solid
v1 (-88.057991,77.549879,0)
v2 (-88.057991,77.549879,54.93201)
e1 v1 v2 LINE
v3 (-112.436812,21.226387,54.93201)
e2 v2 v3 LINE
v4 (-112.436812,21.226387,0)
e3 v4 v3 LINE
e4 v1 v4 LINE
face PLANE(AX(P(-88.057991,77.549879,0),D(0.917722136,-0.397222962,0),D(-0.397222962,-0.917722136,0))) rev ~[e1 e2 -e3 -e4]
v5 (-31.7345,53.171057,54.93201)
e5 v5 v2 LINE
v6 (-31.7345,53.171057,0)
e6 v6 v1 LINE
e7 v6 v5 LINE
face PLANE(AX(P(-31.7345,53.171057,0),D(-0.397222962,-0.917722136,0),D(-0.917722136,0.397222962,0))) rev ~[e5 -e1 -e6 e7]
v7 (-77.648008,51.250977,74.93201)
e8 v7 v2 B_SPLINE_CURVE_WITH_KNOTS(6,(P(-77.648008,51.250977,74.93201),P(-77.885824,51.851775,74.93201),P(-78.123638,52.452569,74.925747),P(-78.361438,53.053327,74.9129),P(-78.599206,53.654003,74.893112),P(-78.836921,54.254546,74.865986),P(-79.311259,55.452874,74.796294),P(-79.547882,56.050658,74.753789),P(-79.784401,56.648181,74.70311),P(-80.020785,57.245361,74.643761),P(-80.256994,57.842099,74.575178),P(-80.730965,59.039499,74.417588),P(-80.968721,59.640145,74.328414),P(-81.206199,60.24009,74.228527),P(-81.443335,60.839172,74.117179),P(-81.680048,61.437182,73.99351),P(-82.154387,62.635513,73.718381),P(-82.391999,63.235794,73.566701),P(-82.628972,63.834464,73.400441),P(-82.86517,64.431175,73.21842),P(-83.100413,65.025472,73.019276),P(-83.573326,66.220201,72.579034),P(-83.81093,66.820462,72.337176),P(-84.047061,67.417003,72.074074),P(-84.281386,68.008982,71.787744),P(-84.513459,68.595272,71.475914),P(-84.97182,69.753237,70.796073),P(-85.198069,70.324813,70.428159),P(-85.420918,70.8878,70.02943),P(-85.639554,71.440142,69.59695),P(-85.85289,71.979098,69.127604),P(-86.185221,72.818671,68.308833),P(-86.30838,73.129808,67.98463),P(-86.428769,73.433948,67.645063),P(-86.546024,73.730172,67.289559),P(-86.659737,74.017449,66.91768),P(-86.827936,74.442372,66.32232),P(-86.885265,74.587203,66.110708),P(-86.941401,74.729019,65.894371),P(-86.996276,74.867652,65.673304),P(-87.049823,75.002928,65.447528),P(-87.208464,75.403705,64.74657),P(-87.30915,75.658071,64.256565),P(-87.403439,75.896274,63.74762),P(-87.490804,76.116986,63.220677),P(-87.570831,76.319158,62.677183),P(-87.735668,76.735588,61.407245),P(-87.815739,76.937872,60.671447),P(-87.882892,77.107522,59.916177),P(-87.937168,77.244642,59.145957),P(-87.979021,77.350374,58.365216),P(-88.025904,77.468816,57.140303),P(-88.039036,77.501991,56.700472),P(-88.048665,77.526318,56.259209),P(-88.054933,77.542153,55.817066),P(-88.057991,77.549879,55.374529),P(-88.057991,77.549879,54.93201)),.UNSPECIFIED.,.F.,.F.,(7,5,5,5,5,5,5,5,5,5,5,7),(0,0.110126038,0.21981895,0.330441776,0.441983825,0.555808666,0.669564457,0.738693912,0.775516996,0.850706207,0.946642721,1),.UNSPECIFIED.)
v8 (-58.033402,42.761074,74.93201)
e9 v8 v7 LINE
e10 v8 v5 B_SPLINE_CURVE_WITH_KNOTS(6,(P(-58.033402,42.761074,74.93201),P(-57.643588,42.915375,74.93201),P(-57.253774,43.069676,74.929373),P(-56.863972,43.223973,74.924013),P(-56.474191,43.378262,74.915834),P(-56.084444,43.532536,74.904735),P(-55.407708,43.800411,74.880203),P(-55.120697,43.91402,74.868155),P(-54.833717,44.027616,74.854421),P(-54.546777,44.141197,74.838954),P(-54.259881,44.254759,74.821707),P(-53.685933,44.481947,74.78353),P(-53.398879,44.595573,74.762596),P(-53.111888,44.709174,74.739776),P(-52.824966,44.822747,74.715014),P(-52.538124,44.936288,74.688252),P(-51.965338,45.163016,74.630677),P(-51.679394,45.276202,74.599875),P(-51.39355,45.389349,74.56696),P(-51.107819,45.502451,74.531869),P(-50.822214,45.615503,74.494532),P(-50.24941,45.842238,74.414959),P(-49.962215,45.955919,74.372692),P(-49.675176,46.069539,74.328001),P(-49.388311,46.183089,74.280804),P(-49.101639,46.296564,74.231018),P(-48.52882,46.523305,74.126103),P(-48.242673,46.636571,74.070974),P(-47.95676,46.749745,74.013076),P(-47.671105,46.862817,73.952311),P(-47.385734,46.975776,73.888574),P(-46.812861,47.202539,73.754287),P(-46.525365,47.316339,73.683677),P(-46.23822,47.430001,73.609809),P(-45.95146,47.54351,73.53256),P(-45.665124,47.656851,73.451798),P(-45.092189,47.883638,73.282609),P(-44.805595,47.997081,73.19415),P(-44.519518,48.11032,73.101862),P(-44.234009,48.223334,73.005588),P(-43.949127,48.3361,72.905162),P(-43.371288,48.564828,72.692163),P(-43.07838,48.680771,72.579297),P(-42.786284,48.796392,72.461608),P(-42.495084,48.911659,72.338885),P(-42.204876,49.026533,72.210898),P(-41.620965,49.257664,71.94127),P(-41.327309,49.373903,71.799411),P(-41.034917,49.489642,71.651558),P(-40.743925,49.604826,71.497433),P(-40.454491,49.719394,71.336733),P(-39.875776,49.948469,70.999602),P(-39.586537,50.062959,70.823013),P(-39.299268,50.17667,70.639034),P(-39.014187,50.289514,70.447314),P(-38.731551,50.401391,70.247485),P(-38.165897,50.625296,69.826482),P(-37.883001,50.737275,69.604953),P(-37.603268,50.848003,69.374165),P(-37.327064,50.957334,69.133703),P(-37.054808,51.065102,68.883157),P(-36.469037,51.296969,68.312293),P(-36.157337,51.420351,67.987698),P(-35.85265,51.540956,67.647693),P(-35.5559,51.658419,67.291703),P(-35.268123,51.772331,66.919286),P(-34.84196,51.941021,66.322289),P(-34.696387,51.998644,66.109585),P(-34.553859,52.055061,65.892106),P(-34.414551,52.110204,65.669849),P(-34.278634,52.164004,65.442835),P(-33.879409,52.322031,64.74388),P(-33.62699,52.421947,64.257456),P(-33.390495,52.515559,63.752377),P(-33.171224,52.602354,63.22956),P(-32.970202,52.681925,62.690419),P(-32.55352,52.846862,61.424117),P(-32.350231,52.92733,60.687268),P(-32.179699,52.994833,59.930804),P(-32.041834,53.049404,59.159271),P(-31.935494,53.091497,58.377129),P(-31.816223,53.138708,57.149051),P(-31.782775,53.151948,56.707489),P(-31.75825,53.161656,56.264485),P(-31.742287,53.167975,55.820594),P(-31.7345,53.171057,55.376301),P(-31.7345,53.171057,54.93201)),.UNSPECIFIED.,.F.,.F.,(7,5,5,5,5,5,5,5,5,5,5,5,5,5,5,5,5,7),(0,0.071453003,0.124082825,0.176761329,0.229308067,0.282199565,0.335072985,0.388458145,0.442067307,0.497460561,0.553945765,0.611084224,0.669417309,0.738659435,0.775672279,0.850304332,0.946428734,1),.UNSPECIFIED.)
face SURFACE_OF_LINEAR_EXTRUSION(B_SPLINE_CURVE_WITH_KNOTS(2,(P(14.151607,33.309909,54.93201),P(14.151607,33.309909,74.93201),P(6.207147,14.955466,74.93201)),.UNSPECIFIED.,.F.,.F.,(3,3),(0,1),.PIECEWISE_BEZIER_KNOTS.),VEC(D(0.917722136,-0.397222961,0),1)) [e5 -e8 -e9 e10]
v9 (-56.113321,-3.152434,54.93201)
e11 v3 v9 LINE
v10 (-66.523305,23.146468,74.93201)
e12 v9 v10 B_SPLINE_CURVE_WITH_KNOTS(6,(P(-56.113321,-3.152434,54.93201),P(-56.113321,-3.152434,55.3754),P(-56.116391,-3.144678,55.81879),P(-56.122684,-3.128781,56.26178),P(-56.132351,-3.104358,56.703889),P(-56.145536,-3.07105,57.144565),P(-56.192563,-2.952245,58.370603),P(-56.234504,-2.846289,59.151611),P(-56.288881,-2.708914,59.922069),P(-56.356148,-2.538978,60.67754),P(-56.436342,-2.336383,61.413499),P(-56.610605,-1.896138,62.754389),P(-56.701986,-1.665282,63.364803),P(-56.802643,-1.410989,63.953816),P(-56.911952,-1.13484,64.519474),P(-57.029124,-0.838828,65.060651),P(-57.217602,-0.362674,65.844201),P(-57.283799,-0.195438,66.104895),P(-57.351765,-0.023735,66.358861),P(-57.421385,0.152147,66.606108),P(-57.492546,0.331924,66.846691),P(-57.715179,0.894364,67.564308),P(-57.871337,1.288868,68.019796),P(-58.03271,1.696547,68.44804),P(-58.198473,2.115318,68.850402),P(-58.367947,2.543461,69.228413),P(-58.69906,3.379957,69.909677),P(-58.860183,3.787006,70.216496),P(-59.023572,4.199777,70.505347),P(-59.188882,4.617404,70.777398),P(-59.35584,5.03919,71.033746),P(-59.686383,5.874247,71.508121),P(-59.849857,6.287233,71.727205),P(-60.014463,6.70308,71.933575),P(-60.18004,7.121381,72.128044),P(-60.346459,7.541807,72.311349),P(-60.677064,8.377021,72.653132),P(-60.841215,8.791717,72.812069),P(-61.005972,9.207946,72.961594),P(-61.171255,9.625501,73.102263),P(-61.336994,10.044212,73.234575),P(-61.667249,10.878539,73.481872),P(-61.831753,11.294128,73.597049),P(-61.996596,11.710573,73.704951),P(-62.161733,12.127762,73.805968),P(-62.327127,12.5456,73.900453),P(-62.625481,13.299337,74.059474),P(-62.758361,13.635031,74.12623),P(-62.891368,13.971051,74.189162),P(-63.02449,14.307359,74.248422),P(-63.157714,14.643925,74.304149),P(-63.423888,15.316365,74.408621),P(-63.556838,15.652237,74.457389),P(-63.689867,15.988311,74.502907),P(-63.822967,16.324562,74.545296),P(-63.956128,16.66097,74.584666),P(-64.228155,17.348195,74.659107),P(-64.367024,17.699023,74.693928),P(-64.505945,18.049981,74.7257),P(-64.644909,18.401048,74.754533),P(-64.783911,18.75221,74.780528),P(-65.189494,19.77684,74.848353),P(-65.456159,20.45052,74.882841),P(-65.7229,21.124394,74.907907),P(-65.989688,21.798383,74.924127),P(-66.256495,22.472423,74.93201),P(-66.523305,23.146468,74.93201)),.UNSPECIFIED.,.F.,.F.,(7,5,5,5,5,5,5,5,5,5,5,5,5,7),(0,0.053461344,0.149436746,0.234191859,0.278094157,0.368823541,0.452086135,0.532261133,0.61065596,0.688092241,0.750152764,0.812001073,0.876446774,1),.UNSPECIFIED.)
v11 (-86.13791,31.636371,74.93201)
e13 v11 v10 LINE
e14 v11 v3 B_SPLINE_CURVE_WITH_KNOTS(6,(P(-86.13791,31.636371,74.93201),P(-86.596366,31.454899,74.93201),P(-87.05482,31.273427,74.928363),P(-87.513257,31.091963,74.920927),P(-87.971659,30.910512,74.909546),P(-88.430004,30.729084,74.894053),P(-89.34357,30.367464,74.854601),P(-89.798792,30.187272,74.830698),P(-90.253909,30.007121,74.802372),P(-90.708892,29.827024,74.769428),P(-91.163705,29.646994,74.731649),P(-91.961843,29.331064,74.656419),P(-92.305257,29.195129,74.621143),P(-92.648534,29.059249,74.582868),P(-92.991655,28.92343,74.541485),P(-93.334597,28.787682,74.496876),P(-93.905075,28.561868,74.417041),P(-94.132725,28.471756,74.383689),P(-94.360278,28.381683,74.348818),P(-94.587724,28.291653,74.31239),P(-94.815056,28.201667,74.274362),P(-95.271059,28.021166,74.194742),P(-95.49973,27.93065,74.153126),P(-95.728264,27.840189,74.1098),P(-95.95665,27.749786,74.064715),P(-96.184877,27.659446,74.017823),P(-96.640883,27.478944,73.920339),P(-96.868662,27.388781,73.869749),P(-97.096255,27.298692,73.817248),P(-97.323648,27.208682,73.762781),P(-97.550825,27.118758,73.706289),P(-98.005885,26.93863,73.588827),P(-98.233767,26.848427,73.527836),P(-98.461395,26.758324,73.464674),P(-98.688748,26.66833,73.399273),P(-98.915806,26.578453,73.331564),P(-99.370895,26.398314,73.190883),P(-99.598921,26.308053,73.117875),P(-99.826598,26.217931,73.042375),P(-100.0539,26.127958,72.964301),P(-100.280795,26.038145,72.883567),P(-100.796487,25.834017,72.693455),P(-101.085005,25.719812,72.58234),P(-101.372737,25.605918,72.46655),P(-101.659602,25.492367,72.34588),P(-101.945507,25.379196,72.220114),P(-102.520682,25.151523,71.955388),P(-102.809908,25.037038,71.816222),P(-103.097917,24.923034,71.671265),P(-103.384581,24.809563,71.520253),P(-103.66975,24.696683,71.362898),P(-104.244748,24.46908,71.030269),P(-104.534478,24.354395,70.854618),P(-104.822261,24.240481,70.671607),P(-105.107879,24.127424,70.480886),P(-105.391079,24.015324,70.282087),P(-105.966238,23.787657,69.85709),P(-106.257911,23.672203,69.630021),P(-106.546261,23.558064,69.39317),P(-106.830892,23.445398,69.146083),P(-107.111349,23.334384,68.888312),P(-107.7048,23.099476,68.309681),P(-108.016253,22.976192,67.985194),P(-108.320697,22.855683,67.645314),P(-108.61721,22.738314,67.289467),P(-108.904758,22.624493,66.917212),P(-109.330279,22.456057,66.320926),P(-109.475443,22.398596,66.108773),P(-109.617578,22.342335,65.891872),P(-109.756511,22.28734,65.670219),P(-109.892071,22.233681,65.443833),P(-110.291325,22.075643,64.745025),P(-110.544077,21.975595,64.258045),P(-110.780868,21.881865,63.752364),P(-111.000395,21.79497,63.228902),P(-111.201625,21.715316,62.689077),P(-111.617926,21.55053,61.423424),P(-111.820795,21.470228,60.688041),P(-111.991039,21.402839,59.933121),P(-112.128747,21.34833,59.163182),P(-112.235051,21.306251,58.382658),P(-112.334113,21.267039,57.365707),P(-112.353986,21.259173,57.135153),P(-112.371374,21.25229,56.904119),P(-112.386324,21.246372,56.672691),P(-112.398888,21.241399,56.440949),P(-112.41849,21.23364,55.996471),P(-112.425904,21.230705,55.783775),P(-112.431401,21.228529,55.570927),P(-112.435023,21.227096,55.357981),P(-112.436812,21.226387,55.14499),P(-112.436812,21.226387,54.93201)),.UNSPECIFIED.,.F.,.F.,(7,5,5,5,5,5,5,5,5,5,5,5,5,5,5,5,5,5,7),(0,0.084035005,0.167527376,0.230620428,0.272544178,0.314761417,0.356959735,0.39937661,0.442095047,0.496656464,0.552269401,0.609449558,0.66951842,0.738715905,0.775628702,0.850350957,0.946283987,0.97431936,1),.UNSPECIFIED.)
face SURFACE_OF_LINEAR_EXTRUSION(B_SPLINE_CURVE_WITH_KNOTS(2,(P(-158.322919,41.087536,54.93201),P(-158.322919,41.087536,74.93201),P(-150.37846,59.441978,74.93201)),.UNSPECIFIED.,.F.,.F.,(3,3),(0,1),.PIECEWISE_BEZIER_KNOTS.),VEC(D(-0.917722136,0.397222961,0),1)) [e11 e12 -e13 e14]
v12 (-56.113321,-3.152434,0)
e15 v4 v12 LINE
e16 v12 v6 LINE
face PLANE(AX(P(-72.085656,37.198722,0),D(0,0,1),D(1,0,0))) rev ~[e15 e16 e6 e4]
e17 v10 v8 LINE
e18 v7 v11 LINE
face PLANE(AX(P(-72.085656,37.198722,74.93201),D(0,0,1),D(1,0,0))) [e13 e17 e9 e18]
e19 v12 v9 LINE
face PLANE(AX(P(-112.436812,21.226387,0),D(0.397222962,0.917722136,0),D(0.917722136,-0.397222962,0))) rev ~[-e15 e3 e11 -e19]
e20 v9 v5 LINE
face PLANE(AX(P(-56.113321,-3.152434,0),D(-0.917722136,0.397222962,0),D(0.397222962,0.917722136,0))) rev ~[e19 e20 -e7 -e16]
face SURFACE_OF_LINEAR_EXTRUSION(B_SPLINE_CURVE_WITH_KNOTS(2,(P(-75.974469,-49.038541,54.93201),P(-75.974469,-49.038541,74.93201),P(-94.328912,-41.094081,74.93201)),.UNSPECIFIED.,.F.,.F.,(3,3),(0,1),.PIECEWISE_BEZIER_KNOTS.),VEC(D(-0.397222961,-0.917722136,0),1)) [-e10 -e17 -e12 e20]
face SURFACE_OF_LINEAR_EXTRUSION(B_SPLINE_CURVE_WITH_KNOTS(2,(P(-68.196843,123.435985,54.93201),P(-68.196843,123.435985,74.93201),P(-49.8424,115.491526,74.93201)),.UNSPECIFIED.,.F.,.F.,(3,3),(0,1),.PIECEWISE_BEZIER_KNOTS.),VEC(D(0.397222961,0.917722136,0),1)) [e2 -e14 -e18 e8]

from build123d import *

# Parameters (mm, degrees)
F1_DEPTH    = 74.93201
F2_T1_DEPTH = 161.3731420762
F2_T3_DEPTH = 161.3731420762
F2_T5_DEPTH = 161.3731420762
F2_T7_DEPTH = 161.3731420762


# Not quite as in the source:
# - a fillet or chamfer that OpenCascade refuses, or shapes differently, is made with other operations: its cross-section is extruded or revolved along the edge and cut away or added


with BuildPart() as f1:
    # F0 (on Top) → F1 (new body)
    with BuildSketch(Plane.XY):
        Polygon((-56.1133213341, -3.1524337828), (-31.7345000803, 53.1710572541), (-88.0579911172, 77.5498785079), (-112.436812371, 21.226387471), align=None)
    extrude(amount=F1_DEPTH)

    # F2: fillet of radius 20 on 4 edges, made by hand

    # F2_s2 → F2_t1 (cut)
    with BuildSketch(Plane(origin=(-29.8642383226, -68.9966976654, 0), x_dir=(0, 0, 1), z_dir=(0.3972229615, 0.917722136, 0))):
        with BuildLine():
            add(Edge.make_bspline(
                [(54.93201, -50.2442180275), (74.93201, -50.2442180275), (74.93201, -70.2442180275)],
                knots=[0, 0, 0, 1, 1, 1], degree=2, weights=[1, 1, 1]))
            Line((74.93201, -70.2442180275), (74.93201, -50.2442180275))
            Line((74.93201, -50.2442180275), (54.93201, -50.2442180275))
        make_face()
    extrude(amount=F2_T1_DEPTH, mode=Mode.SUBTRACT)

    # F2_s4 → F2_t3 (cut)
    with BuildSketch(Plane(origin=(-0.2241242898, 0.0970090081, 0), x_dir=(0, 0, 1), z_dir=(-0.917722136, 0.3972229615, 0))):
        with BuildLine():
            add(Edge.make_bspline(
                [(54.93201, 36.1905841301), (74.93201, 36.1905841301), (74.93201, 16.1905841301)],
                knots=[0, 0, 0, 1, 1, 1], degree=2, weights=[1, 1, 1]))
            Line((74.93201, 16.1905841301), (74.93201, 36.1905841301))
            Line((74.93201, 36.1905841301), (54.93201, 36.1905841301))
        make_face()
    extrude(amount=F2_T3_DEPTH, mode=Mode.SUBTRACT)

    # F2_s6 → F2_t5 (cut)
    with BuildSketch(Plane(origin=(34.236879084, 79.0990069677, 0), x_dir=(0, 0, 1), z_dir=(-0.3972229615, -0.917722136, 0))):
        with BuildLine():
            add(Edge.make_bspline(
                [(54.93201, 111.6173601037), (74.93201, 111.6173601037), (74.93201, 91.6173601037)],
                knots=[0, 0, 0, 1, 1, 1], degree=2, weights=[1, 1, 1]))
            Line((74.93201, 91.6173601037), (74.93201, 111.6173601037))
            Line((74.93201, 111.6173601037), (54.93201, 111.6173601037))
        make_face()
    extrude(amount=F2_T5_DEPTH, mode=Mode.SUBTRACT)

    # F2_s8 → F2_t7 (cut)
    with BuildSketch(Plane(origin=(-148.3198289229, 64.1981264147, 0), x_dir=(0, 0, 1), z_dir=(0.917722136, -0.3972229615, 0))):
        with BuildLine():
            add(Edge.make_bspline(
                [(54.93201, 25.1825579461), (74.93201, 25.1825579461), (74.93201, 5.1825579461)],
                knots=[0, 0, 0, 1, 1, 1], degree=2, weights=[1, 1, 1]))
            Line((74.93201, 5.1825579461), (74.93201, 25.1825579461))
            Line((74.93201, 25.1825579461), (54.93201, 25.1825579461))
        make_face()
    extrude(amount=F2_T7_DEPTH, mode=Mode.SUBTRACT)


solid = f1.part
